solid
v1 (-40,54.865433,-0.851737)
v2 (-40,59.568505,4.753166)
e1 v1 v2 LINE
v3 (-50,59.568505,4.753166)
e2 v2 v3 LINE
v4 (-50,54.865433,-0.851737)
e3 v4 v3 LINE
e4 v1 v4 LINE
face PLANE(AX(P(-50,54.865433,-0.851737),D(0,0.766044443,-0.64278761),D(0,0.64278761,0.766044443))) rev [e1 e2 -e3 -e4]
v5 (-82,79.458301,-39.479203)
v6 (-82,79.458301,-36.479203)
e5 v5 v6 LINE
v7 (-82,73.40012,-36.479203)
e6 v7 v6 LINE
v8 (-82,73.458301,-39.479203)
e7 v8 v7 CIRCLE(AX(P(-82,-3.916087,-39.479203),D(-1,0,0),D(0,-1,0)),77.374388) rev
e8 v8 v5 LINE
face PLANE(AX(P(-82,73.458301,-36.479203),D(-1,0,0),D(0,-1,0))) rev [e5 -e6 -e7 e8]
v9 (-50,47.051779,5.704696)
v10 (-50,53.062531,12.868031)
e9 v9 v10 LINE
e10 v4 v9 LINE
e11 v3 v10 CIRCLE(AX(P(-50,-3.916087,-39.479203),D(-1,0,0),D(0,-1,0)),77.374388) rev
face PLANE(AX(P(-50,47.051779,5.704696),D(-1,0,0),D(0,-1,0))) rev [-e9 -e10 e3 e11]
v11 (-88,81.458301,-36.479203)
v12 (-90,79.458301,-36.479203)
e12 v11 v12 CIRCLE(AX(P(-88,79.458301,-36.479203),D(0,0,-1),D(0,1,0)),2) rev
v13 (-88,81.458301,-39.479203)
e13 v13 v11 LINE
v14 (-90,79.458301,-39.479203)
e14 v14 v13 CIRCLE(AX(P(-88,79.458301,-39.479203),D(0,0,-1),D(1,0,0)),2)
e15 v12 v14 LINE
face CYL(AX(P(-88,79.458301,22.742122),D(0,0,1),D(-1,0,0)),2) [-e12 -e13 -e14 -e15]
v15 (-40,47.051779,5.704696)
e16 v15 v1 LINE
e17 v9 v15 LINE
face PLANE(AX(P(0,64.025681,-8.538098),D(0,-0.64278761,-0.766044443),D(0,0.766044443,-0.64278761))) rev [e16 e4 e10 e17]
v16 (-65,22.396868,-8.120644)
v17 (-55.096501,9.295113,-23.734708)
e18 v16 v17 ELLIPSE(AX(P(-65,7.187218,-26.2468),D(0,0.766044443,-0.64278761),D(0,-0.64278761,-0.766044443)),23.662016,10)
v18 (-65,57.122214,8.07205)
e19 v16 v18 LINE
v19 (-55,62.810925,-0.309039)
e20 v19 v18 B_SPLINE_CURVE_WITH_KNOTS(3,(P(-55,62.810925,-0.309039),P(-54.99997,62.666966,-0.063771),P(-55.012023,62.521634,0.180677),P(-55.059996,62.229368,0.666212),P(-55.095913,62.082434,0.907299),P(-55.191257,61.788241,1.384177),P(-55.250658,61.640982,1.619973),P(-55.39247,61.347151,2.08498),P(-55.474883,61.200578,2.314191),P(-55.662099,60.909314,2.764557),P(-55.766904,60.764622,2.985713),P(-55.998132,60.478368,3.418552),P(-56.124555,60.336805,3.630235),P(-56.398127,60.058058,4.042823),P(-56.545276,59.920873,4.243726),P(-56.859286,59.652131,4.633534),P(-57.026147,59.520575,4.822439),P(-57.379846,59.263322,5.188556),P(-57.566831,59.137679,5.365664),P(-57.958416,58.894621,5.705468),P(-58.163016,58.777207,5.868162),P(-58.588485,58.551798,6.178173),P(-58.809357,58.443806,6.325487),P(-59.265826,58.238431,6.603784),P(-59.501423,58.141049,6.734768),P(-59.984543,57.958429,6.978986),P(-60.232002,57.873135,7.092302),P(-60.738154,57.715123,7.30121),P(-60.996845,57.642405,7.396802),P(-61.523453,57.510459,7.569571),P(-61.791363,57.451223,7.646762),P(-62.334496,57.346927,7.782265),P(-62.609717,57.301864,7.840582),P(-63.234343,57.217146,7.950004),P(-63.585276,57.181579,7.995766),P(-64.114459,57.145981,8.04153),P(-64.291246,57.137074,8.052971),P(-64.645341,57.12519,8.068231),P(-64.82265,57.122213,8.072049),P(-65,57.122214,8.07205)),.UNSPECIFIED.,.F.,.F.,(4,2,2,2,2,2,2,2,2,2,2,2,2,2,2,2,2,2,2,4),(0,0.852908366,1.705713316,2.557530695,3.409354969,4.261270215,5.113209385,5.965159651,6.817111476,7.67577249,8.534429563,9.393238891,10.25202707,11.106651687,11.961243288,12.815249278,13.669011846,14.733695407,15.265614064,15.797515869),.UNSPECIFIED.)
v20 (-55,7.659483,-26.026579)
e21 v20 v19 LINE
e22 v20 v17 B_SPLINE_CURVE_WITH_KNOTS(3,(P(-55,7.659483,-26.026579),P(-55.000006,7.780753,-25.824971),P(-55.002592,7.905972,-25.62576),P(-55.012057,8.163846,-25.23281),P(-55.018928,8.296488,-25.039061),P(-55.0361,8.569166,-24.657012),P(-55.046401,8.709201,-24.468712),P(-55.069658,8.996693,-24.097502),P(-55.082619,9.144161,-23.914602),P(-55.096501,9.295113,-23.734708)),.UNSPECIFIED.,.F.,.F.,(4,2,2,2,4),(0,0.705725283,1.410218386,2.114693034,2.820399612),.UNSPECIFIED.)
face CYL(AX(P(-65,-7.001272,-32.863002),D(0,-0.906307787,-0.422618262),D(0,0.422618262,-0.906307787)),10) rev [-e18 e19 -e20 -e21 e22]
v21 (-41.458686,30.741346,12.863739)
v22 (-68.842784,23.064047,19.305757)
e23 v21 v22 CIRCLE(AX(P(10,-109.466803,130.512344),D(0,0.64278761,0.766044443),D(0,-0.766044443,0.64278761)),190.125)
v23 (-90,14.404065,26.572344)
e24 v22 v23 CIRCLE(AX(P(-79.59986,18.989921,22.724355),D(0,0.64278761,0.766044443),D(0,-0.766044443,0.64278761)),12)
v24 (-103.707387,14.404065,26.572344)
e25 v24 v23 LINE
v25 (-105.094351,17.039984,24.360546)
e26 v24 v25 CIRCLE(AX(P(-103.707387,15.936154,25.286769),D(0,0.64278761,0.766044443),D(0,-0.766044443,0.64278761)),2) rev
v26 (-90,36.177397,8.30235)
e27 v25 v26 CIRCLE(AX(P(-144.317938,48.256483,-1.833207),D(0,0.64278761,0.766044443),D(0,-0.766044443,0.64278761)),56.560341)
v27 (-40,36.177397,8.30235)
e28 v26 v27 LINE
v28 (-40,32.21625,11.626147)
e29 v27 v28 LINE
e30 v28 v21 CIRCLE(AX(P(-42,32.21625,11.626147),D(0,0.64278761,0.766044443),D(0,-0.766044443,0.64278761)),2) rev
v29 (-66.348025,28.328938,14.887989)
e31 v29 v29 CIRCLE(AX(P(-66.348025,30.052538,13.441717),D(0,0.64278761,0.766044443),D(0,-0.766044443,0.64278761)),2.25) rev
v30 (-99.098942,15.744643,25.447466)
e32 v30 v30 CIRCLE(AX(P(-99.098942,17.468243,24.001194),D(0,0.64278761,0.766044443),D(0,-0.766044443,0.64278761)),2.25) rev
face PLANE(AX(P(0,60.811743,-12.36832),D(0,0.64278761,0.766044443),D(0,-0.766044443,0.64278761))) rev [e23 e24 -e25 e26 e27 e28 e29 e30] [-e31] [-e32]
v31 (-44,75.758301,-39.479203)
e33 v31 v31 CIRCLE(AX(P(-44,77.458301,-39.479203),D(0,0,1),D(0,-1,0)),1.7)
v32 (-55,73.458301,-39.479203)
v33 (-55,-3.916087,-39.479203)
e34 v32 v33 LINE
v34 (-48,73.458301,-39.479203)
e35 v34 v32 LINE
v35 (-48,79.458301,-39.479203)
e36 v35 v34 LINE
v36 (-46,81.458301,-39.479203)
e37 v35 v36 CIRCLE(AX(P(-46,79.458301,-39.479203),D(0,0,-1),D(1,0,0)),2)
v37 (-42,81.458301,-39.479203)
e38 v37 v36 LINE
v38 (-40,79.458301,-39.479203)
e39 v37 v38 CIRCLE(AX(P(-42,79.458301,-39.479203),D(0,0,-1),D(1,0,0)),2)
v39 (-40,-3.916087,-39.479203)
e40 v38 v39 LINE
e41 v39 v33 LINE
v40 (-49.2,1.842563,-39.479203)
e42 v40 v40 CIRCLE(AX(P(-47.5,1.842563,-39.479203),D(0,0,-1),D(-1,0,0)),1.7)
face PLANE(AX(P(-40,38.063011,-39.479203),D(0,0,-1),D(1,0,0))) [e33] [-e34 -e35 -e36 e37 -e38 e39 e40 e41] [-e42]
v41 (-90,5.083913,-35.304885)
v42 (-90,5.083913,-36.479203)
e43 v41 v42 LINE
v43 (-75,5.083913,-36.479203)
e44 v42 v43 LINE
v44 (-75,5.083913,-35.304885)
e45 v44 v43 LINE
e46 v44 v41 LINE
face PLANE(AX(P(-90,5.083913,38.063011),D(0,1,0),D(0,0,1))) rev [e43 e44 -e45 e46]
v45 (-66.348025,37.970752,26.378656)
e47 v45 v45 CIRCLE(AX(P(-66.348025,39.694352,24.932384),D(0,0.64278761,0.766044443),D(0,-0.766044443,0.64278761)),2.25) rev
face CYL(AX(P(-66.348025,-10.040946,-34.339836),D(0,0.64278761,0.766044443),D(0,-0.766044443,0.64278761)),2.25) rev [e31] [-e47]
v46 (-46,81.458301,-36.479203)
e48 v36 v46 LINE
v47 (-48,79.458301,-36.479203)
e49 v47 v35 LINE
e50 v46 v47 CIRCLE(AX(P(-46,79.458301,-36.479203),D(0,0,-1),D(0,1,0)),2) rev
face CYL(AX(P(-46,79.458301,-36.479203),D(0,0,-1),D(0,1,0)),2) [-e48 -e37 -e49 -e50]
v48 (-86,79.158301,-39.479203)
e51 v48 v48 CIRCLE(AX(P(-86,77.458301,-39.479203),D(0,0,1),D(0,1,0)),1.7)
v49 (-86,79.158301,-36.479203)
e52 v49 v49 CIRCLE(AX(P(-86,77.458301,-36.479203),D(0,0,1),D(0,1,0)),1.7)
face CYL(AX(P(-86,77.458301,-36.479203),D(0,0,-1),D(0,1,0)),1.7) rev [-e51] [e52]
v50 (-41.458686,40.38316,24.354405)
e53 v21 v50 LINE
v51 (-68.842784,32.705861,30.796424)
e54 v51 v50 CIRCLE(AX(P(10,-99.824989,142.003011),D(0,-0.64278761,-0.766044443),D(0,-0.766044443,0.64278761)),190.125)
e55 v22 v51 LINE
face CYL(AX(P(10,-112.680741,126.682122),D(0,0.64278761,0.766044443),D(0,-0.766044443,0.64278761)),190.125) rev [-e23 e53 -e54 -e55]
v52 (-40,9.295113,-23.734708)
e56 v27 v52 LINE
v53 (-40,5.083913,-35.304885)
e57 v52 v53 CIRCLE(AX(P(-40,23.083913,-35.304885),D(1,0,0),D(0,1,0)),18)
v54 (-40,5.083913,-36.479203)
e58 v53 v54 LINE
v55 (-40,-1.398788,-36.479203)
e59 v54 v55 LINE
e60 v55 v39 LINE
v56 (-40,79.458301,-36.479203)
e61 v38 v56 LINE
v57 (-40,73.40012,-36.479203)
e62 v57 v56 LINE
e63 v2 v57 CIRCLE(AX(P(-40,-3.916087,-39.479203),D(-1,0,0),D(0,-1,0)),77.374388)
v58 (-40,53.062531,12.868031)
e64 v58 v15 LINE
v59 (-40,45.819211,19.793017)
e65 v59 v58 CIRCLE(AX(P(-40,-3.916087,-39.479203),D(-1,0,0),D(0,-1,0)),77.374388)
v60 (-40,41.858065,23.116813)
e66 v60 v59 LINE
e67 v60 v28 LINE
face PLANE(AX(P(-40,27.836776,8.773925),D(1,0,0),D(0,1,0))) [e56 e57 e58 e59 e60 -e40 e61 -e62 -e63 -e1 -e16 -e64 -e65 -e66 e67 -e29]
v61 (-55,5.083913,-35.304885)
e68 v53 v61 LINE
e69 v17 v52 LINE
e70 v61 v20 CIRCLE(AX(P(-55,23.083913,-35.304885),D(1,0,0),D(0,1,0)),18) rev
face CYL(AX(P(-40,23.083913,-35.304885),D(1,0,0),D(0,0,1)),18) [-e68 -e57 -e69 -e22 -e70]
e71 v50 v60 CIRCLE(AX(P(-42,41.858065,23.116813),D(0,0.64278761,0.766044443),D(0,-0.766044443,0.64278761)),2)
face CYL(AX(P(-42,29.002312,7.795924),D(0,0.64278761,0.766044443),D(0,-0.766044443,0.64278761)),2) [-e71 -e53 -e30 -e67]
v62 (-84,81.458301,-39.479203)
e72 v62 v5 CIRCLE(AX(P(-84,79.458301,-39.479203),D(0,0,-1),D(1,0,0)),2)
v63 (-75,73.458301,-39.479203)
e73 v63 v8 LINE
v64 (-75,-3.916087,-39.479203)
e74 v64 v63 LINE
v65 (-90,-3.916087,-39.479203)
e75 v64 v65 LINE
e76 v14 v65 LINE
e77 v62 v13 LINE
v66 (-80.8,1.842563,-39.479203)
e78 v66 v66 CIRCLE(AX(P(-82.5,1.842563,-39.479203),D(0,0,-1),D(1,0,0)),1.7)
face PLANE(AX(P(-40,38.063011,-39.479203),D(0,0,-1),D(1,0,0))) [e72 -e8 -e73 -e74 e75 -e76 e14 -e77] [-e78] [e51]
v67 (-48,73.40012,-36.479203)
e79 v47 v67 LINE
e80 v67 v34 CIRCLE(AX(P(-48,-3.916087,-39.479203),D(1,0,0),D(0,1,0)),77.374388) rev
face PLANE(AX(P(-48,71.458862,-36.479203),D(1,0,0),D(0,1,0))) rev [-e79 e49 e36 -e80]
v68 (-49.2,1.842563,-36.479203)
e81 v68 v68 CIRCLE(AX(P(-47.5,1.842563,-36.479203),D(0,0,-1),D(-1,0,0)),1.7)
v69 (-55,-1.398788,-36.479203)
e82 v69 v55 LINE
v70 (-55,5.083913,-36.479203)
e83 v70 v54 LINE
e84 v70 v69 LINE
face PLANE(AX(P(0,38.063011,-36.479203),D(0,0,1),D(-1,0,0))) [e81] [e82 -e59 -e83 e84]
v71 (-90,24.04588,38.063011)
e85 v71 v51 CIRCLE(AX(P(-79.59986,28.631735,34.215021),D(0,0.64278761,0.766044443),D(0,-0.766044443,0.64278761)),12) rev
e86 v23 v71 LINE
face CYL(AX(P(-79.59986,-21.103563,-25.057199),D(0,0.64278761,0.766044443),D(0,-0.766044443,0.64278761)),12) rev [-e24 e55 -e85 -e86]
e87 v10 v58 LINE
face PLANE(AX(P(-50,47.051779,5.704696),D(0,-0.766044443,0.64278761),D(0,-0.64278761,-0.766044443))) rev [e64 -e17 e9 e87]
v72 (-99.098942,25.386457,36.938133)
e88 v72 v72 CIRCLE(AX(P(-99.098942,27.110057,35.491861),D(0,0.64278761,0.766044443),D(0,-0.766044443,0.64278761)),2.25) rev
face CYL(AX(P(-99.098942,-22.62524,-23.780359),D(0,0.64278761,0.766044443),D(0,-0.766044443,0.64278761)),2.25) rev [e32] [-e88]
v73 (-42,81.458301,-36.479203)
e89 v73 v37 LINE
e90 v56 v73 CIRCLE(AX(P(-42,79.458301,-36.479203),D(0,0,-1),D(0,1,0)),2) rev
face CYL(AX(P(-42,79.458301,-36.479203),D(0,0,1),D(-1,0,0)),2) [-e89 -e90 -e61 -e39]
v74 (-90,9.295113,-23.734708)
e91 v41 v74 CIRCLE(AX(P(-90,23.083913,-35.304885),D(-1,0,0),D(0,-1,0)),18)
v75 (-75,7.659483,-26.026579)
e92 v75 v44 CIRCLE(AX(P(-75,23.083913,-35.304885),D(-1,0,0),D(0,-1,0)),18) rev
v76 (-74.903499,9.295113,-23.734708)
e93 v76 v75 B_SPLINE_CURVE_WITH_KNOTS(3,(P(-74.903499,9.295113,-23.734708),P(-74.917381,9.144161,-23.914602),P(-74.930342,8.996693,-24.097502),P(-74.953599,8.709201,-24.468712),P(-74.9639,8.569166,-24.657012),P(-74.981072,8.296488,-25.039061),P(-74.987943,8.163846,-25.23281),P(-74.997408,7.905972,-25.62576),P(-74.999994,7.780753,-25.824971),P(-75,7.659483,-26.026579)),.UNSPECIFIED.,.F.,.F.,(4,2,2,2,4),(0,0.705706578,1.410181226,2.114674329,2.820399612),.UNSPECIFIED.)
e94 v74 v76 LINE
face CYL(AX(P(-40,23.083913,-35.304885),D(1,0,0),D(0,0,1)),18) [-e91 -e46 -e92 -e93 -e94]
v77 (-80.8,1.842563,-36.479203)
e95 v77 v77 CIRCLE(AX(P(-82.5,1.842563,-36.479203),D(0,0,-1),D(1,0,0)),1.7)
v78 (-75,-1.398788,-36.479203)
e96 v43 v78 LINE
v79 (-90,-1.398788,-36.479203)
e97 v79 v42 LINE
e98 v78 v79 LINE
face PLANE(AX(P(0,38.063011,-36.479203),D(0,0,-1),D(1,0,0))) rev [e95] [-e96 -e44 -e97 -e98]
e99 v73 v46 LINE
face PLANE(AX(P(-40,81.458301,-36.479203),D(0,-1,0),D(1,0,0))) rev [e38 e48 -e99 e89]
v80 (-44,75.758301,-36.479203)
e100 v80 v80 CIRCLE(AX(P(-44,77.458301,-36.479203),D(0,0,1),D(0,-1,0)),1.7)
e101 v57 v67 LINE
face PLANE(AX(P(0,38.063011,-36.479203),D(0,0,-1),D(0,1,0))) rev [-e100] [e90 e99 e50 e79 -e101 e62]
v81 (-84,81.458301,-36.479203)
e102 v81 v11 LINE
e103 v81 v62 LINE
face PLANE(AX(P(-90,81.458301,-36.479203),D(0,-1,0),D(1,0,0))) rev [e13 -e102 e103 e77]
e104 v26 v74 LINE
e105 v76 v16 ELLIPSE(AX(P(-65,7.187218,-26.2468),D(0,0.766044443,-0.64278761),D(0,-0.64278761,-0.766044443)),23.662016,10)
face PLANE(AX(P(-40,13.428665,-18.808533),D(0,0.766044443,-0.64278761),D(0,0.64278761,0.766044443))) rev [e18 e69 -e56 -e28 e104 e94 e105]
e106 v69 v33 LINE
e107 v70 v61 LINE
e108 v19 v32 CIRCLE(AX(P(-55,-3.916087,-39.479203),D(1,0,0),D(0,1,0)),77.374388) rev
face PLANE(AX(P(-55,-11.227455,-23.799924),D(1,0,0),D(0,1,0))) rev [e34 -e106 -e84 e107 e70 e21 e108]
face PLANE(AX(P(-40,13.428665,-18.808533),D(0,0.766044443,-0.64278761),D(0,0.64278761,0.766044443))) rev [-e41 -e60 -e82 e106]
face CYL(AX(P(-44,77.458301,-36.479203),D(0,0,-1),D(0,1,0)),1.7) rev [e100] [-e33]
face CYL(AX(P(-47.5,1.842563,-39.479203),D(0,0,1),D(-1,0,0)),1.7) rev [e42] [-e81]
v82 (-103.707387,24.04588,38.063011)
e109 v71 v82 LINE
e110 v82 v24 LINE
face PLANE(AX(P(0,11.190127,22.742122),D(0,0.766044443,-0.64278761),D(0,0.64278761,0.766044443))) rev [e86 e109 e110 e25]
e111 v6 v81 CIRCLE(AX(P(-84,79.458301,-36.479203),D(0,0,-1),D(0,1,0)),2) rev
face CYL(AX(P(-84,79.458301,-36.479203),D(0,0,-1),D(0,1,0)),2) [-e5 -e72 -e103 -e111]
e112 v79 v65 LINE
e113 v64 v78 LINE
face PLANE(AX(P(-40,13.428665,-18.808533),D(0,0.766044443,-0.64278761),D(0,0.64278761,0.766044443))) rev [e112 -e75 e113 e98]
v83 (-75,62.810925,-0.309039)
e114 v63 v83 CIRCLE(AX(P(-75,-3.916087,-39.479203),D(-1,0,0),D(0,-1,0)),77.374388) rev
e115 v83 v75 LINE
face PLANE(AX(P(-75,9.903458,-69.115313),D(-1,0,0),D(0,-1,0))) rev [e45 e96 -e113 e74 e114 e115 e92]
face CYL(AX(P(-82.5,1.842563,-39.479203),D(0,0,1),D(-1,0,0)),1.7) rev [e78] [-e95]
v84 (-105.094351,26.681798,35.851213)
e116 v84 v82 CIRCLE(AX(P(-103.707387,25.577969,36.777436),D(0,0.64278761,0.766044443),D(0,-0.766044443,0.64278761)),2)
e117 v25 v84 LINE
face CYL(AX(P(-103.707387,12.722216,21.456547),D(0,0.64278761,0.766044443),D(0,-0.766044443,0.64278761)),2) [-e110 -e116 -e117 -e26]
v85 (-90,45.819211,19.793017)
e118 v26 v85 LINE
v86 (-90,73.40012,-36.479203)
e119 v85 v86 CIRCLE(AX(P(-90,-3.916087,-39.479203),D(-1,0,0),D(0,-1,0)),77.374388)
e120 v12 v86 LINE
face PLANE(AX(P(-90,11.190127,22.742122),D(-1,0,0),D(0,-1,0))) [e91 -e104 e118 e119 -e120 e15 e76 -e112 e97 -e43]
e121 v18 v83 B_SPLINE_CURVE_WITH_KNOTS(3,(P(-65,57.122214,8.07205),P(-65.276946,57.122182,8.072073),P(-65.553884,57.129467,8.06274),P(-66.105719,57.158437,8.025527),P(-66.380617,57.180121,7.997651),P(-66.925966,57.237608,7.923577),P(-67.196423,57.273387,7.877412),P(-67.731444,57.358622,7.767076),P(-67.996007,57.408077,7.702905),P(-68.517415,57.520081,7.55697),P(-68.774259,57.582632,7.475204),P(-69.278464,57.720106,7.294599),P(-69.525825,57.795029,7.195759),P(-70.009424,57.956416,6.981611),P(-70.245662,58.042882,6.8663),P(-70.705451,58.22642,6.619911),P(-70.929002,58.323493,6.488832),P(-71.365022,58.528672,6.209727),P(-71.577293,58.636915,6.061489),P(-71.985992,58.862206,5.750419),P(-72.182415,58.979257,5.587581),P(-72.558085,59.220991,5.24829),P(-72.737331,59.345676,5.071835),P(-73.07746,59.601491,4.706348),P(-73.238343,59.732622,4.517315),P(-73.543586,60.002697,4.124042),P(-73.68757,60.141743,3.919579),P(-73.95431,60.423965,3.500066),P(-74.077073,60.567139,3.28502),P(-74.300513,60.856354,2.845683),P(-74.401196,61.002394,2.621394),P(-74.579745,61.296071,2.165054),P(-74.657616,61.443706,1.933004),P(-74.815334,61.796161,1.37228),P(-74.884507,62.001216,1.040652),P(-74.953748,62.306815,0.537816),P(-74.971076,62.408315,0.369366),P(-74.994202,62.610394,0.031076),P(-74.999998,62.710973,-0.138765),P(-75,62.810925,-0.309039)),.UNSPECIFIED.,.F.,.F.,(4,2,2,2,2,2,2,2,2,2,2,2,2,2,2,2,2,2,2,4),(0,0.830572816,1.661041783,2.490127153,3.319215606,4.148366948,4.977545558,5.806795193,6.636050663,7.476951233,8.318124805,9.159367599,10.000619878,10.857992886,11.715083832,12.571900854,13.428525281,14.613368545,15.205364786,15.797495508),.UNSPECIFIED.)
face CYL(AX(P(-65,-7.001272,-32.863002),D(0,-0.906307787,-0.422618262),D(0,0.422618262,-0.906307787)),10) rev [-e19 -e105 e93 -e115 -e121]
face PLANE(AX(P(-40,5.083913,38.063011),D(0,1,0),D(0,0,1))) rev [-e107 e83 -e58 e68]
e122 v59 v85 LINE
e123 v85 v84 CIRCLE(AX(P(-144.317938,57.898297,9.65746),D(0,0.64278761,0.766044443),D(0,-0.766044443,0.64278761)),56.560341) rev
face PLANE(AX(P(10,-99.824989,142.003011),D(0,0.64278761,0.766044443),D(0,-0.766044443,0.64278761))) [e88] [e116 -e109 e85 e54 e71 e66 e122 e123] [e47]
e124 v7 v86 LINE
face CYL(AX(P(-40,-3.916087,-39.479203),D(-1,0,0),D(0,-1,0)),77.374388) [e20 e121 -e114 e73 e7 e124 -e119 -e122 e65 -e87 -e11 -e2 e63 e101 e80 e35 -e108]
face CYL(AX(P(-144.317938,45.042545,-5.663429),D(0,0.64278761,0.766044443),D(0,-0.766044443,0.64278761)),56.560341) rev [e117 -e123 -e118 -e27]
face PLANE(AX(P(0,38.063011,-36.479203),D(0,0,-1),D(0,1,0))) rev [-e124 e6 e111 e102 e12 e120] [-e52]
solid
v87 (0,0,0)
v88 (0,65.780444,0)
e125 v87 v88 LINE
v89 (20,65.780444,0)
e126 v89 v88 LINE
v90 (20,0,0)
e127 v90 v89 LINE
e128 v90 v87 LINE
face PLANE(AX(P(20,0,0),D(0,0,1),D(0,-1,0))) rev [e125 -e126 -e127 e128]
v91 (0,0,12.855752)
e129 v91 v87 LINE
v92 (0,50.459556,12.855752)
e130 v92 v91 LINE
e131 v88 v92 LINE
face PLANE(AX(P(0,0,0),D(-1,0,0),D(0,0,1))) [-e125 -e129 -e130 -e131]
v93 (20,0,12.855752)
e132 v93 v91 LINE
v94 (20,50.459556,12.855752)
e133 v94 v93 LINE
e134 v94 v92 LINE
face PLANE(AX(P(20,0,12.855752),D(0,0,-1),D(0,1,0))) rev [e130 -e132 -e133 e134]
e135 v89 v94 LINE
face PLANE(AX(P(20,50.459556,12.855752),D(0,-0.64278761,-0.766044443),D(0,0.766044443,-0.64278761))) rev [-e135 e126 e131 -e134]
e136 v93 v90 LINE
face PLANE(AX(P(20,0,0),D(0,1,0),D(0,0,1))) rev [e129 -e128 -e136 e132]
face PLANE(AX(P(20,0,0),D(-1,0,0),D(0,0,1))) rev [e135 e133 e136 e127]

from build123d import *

# Parameters (mm, degrees)
AUFSATZ_LINEAR_AUSTRAGEN1_DEPTH    = 20
AUFSATZ_LINEAR_AUSTRAGEN2_DEPTH    = 20
AUFSATZ_LINEAR_AUSTRAGEN2_2_DEPTH  = 20
AUFSATZ_LINEAR_AUSTRAGEN3_DEPTH    = 50
AUFSATZ_LINEAR_AUSTRAGEN4_DEPTH    = 20
SCHNITT_LINEAR_AUSTRAGEN1_DEPTH    = 154.923378277
AUFSATZ_LINEAR_AUSTRAGEN5_DEPTH    = 50
VERRUNDUNG3_R                      = 2
SCHNITT_LINEAR_AUSTRAGEN3_DEPTH    = 5
SKIZZE12_W                         = 20
SKIZZE12_H                         = 50
SCHNITT_LINEAR_AUSTRAGEN4_DEPTH    = 163.425006425
VERRUNDUNG5_R                      = 10
VERRUNDUNG6_R                      = 10
SKIZZE13_R                         = 1.7
AUFSATZ_LINEAR_AUSTRAGEN9_DEPTH    = 3
VERRUNDUNG7_R                      = 2
VERRUNDUNG8_R                      = 2
SKIZZE14_W                         = 15
SKIZZE14_H                         = 9
SCHNITT_LINEAR_AUSTRAGEN5_DEPTH    = 156.193041065
VERRUNDUNG9_R                      = 18
SKIZZE15_R                         = 1.7
SCHNITT_LINEAR_AUSTRAGEN6_DEPTH    = 156.193041065
VERRUNDUNG10_R                     = 2
SKIZZE10_R                         = 2.25
SCHNITT_LINEAR_AUSTRAGEN2_DEPTH    = 152.160730356
SKIZZE18_W                         = 120
SKIZZE18_H                         = 10.2
SCHNITT_LINEAR_AUSTRAGEN8_DEPTH    = 10
VERRUNDUNG12_R                     = 18
VERRUNDUNG13_R                     = 2
SKIZZE16_R                         = 102.012355423
SCHNITT_LINEAR_AUSTRAGEN9_DEPTH    = 189.028945254
K_RPER_VERSCHIEBEN_KOPIEREN1_ANGLE = 90


with BuildPart() as part:
    # Skizze1 → Aufsatz-Linear austragen1 (new body)
    with BuildSketch(Plane(origin=(0, 0, 0), x_dir=(0, 0, -1), z_dir=(1, 0, 0))):
        Polygon((0, 0), (0, 65.780444431), (-12.855752194, 50.459555569), (-12.855752194, 0), align=None)
    extrude(amount=AUFSATZ_LINEAR_AUSTRAGEN1_DEPTH)


with BuildPart() as body_2:
    # Skizze2 → Aufsatz-Linear austragen2 (new body)
    with BuildSketch(Plane(origin=(0, 38.601549366, -32.390545836), x_dir=(-1, 0, 0), z_dir=(0, 0.7660444431189743, -0.6427876096865437))):
        with BuildLine():
            Line((90, 60.580920128), (90, 32.15785464))
            Line((90, 32.15785464), (40, 32.15785464))
            Line((40, 32.15785464), (40, 38.850263138))
            ThreePointArc((40, 38.850263138), (65.782949027, 47.91410669), (90, 60.580920128))
        make_face()
    extrude(amount=-AUFSATZ_LINEAR_AUSTRAGEN2_DEPTH)

    # Skizze4 → Aufsatz-Linear austragen3 (add)
    with BuildSketch(Plane.ZY.offset(90)):
        with BuildLine():
            ThreePointArc((-7.756199987, 59.272219883), (-28.145912406, 32.699829313), (-35.395290034, 0))
            Line((-35.395290034, 0), (41.979097856, 0))
            Line((41.979097856, 0), (5.099552207, 43.951331021))
            Line((5.099552207, 43.951331021), (-7.756199987, 59.272219883))
        make_face()
    extrude(amount=-AUFSATZ_LINEAR_AUSTRAGEN3_DEPTH)



with BuildPart() as body_3:
    # Skizze2 → Aufsatz-Linear austragen2 2 (new body)
    with BuildSketch(Plane(origin=(0, 38.601549366, -32.390545836), x_dir=(-1, 0, 0), z_dir=(0, 0.7660444431189743, -0.6427876096865437))):
        with BuildLine():
            Line((-110, 60.580920128), (-110, 32.15785464))
            Line((-110, 32.15785464), (-60, 32.15785464))
            Line((-60, 32.15785464), (-60, 38.850263138))
            ThreePointArc((-60, 38.850263138), (-85.782949027, 47.91410669), (-110, 60.580920128))
        make_face()
    extrude(amount=-AUFSATZ_LINEAR_AUSTRAGEN2_2_DEPTH)


with BuildPart() as body_2_1:
    add(body_2.part)

    add(body_3.part)  # Aufsatz-Linear austragen4 merges body 3
    # Skizze6 → Aufsatz-Linear austragen4 (add)
    with BuildSketch(Plane(origin=(0, 38.601549366, -32.390545836), x_dir=(1, 0, 0), z_dir=(0, 0.7660444431189745, -0.6427876096865438))):
        with BuildLine():
            ThreePointArc((-90, -32.15785464), (-97.308492273, -47.841026987), (-109.016228044, -60.580920128))
            Line((-109.016228044, -60.580920128), (-90, -60.580920128))
            Line((-90, -60.580920128), (-90, -32.15785464))
        make_face()
        with BuildLine():
            ThreePointArc((110, -32.15785464), (117.308492273, -47.841026987), (129.016228044, -60.580920128))
            Line((129.016228044, -60.580920128), (110, -60.580920128))
            Line((110, -60.580920128), (110, -32.15785464))
        make_face()
    extrude(amount=-AUFSATZ_LINEAR_AUSTRAGEN4_DEPTH)

    # Skizze5 → Schnitt-Linear austragen1 (cut, through all)
    with BuildSketch(Plane(origin=(0, 38.601549366, -32.390545836), x_dir=(1, 0, 0), z_dir=(0, 0.7660444431189745, -0.6427876096865438))):
        with BuildLine():
            ThreePointArc((-68.842783939, -49.276117645), (-85.255078401, -44.010631162), (-90, -60.580920128))
            ThreePointArc((-90, -60.580920128), (-79.599860388, -54.594510849), (-68.842783939, -49.276117645))
        make_face()
        with BuildLine():
            ThreePointArc((110, -60.580920128), (93.944642376, -65.178390536), (88.842783939, -49.276117645))
            ThreePointArc((88.842783939, -49.276117645), (105.255078401, -44.010631162), (110, -60.580920128))
        make_face()
    extrude(amount=-SCHNITT_LINEAR_AUSTRAGEN1_DEPTH, mode=Mode.SUBTRACT)

    # Skizze7 → Aufsatz-Linear austragen5 (add)
    with BuildSketch(Plane(origin=(60, 0, 0), x_dir=(0, 0, -1), z_dir=(1, 0, 0))):
        with BuildLine():
            Line((7.756199987, 59.272219883), (-41.979097856, 0))
            Line((-41.979097856, 0), (35.395290034, 0))
            ThreePointArc((35.395290034, 0), (28.145912406, 32.699829313), (7.756199987, 59.272219883))
        make_face()
    extrude(amount=AUFSATZ_LINEAR_AUSTRAGEN5_DEPTH)

    # Verrundung3
    verrundung3_edges = [body_2_1.edges().sort_by_distance(p)[0] for p in [
        (-109.016228044, 69.881769777, 20.445007484),
    ]]
    fillet(verrundung3_edges, radius=VERRUNDUNG3_R)

    # Skizze11 → Schnitt-Linear austragen3 (cut)
    with BuildSketch(Plane(origin=(0, 23.280660504, -19.534793642), x_dir=(1, 0, 0), z_dir=(0, -0.7660444431189745, 0.6427876096865438))):
        Polygon((60, 32.15785464), (110, 32.15785464), (141.028212288, 65.900023971), (38.343577108, 62.99282009), align=None)
        Polygon((-90, 32.15785464), (-40, 32.15785464), (-27.275304948, 44.003224364), (-71.113024931, 77.628353479), (-115.714952394, 75.544151261), (-104.04695397, 34.691764174), align=None)
    extrude(amount=-SCHNITT_LINEAR_AUSTRAGEN3_DEPTH, mode=Mode.SUBTRACT)

    # Skizze12 → Schnitt-Linear austragen4 (cut, through all)
    with BuildSketch(Plane(origin=(0, 16.620901993, -35.64363935), x_dir=(-1, 0, 0), z_dir=(0, 0.4226182617407026, -0.9063077870366486))):
        with Locations((65, 10.041304052)):
            Rectangle(SKIZZE12_W, SKIZZE12_H)
        with Locations((-85, 10.041304052)):
            Rectangle(SKIZZE12_W, SKIZZE12_H)
    extrude(amount=-SCHNITT_LINEAR_AUSTRAGEN4_DEPTH, mode=Mode.SUBTRACT)

    # Verrundung5
    verrundung5_edges = [body_2_1.edges().sort_by_distance(p)[0] for p in [
        (75, 39.454906174, -1.696530215),
        (95, 39.454906174, -1.696530215),
    ]]
    fillet(verrundung5_edges, radius=VERRUNDUNG5_R - 0.0001)  # a hair under: the kernel refuses the full size

    # Verrundung6
    verrundung6_edges = [body_2_1.edges().sort_by_distance(p)[0] for p in [
        (-55, 39.454906174, -1.696530215),
        (-75, 39.454906174, -1.696530215),
    ]]
    fillet(verrundung6_edges, radius=VERRUNDUNG6_R - 0.0001)  # a hair under: the kernel refuses the full size

    # Skizze13 → Aufsatz-Linear austragen9 (add)
    # profile 1 of 4: a face of its own
    with BuildSketch(Plane(origin=(0, 0, 0), x_dir=(1, 0, 0), z_dir=(0, 1, 0))):
        Polygon((-40, 35.395290034), (-40, 43.395290034), (-48, 43.395290034), (-48, 35.395290034), (-48, 33.395851283), (-40, 33.395851283), align=None)
        with Locations(Location((-44, 39.395290034, 0), (0, 0, 270))):
            Circle(SKIZZE13_R, mode=Mode.SUBTRACT)
    # profile 2 of 4: a face of its own
    with BuildSketch(Plane(origin=(0, 0, 0), x_dir=(1, 0, 0), z_dir=(0, 1, 0))):
        Polygon((-90, 43.395290034), (-82, 43.395290034), (-82, 35.395290034), (-82, 33.395851283), (-90, 33.395851283), (-90, 35.395290034), align=None)
        with Locations(Location((-86, 39.395290034, 0), (0, 0, 90))):
            Circle(SKIZZE13_R, mode=Mode.SUBTRACT)
    # profile 3 of 4: a face of its own
    with BuildSketch(Plane(origin=(0, 0, 0), x_dir=(1, 0, 0), z_dir=(0, 1, 0))):
        Polygon((68, 33.395851283), (68, 35.395290034), (68, 43.395290034), (60, 43.395290034), (60, 35.395290034), (60, 33.395851283), align=None)
        with Locations(Location((64, 39.395290034, 0), (0, 0, 90))):
            Circle(SKIZZE13_R, mode=Mode.SUBTRACT)
    # profile 4 of 4: a face of its own
    with BuildSketch(Plane(origin=(0, 0, 0), x_dir=(1, 0, 0), z_dir=(0, 1, 0))):
        Polygon((110, 33.395851283), (102, 33.395851283), (102, 35.395290034), (102, 43.395290034), (110, 43.395290034), (110, 35.395290034), align=None)
        with Locations(Location((106, 39.395290034, 0), (0, 0, 270))):
            Circle(SKIZZE13_R, mode=Mode.SUBTRACT)
    extrude(amount=AUFSATZ_LINEAR_AUSTRAGEN9_DEPTH)

    # Verrundung7
    verrundung7_edges = [body_2_1.edges().sort_by_distance(p)[0] for p in [
        (-40, 1.5, -43.395290034),
        (-48, 1.5, -43.395290034),
        (-90, 1.5, -43.395290034),
        (-82, 1.5, -43.395290034),
    ]]
    fillet(verrundung7_edges, radius=VERRUNDUNG7_R)

    # Verrundung8
    verrundung8_edges = [body_2_1.edges().sort_by_distance(p)[0] for p in [
        (60, 1.5, -43.395290034),
        (68, 1.5, -43.395290034),
        (102, 1.5, -43.395290034),
        (110, 1.5, -43.395290034),
    ]]
    fillet(verrundung8_edges, radius=VERRUNDUNG8_R)

    # Skizze14 → Schnitt-Linear austragen5 (cut, through all)
    with BuildSketch(Plane(origin=(0, 3, 0), x_dir=(-1, 0, 0), z_dir=(0, -1, 0))):
        with Locations((82.5, -37.479097856)):
            Rectangle(SKIZZE14_W, SKIZZE14_H)
        with Locations((47.5, -37.479097856)):
            Rectangle(SKIZZE14_W, SKIZZE14_H)
        with Locations((-67.5, -37.479097856)):
            Rectangle(SKIZZE14_W, SKIZZE14_H)
        with Locations((-102.5, -37.479097856)):
            Rectangle(SKIZZE14_W, SKIZZE14_H)
    extrude(amount=-SCHNITT_LINEAR_AUSTRAGEN5_DEPTH, mode=Mode.SUBTRACT)

    # Verrundung9
    verrundung9_edges = [body_2_1.edges().sort_by_distance(p)[0] for p in [
        (-47.5, 10.725782333, 32.979097856),
        (-82.5, 10.725782333, 32.979097856),
    ]]
    fillet(verrundung9_edges, radius=VERRUNDUNG9_R)

    # Skizze15 → Schnitt-Linear austragen6 (cut, through all)
    with BuildSketch(Plane(origin=(0, 3, 0), x_dir=(-1, 0, 0), z_dir=(0, -1, 0))):
        with Locations(Location((82.5, -36.22044841, 0), (0, 0, 180))):
            Circle(SKIZZE15_R)
        with Locations((47.5, -36.22044841)):
            Circle(SKIZZE15_R)
        with Locations((-102.5, -36.22044841)):
            Circle(SKIZZE15_R)
        with Locations(Location((-67.5, -36.22044841, 0), (0, 0, 180))):
            Circle(SKIZZE15_R)
    extrude(amount=SCHNITT_LINEAR_AUSTRAGEN6_DEPTH, mode=Mode.SUBTRACT)

    # Verrundung10
    verrundung10_edges = [body_2_1.edges().sort_by_distance(p)[0] for p in [
        (129.016228044, 71.796880885, 18.838038459),
        (60, 57.828683821, 2.191389427),
    ]]
    fillet(verrundung10_edges, radius=VERRUNDUNG10_R)

    # Skizze10 → Schnitt-Linear austragen2 (cut, through all)
    with BuildSketch(Plane(origin=(0, 38.601549366, -32.390545836), x_dir=(1, 0, 0), z_dir=(0, 0.7660444431189745, -0.6427876096865438))):
        with Locations(Location((119.098941858, -56.580920128, 0), (0, 0, 270))):
            Circle(SKIZZE10_R)
        with Locations(Location((86.348024598, -40.153290395, 0), (0, 0, 270))):
            Circle(SKIZZE10_R)
        with Locations(Location((-66.348024598, -40.153290395, 0), (0, 0, 270))):
            Circle(SKIZZE10_R)
        with Locations(Location((-99.098941858, -56.580920128, 0), (0, 0, 270))):
            Circle(SKIZZE10_R)
    extrude(amount=-SCHNITT_LINEAR_AUSTRAGEN2_DEPTH, mode=Mode.SUBTRACT)

    # Skizze18 → Schnitt-Linear austragen8 (cut)
    with BuildSketch(Plane(origin=(0, 38.601549366, -32.390545836), x_dir=(1, 0, 0), z_dir=(0, 0.7660444431189745, -0.6427876096865438))):
        with Locations((10, -17.05785464)):
            Rectangle(SKIZZE18_W, SKIZZE18_H)
    extrude(amount=-SCHNITT_LINEAR_AUSTRAGEN8_DEPTH, mode=Mode.SUBTRACT)

    # Verrundung12
    verrundung12_edges = [body_2_1.edges().sort_by_distance(p)[0] for p in [
        (102.5, 10.725782333, 32.979097856),
        (67.5, 10.725782333, 32.979097856),
    ]]
    fillet(verrundung12_edges, radius=VERRUNDUNG12_R)

    # Verrundung13
    verrundung13_edges = [body_2_1.edges().sort_by_distance(p)[0] for p in [
        (-40, 57.828683821, 2.191389427),
    ]]
    fillet(verrundung13_edges, radius=VERRUNDUNG13_R)

    # Skizze16 → Schnitt-Linear austragen9 (cut, through all)
    with BuildSketch(Plane(origin=(60, 0, 0), x_dir=(0, 0, -1), z_dir=(1, 0, 0))):
        with Locations((7.48825997, 22.250503314)):
            Circle(SKIZZE16_R)
    extrude(amount=SCHNITT_LINEAR_AUSTRAGEN9_DEPTH, mode=Mode.SUBTRACT)


with BuildPart() as body_2_2:
    # Körper-Verschieben/Kopieren1: moved
    add(body_2_1.part.rotate(Axis((0, 38.771107104, -0.708096089), (1, 0, 0)), K_RPER_VERSCHIEBEN_KOPIEREN1_ANGLE))


solid = Compound([part.part, body_2_2.part])
